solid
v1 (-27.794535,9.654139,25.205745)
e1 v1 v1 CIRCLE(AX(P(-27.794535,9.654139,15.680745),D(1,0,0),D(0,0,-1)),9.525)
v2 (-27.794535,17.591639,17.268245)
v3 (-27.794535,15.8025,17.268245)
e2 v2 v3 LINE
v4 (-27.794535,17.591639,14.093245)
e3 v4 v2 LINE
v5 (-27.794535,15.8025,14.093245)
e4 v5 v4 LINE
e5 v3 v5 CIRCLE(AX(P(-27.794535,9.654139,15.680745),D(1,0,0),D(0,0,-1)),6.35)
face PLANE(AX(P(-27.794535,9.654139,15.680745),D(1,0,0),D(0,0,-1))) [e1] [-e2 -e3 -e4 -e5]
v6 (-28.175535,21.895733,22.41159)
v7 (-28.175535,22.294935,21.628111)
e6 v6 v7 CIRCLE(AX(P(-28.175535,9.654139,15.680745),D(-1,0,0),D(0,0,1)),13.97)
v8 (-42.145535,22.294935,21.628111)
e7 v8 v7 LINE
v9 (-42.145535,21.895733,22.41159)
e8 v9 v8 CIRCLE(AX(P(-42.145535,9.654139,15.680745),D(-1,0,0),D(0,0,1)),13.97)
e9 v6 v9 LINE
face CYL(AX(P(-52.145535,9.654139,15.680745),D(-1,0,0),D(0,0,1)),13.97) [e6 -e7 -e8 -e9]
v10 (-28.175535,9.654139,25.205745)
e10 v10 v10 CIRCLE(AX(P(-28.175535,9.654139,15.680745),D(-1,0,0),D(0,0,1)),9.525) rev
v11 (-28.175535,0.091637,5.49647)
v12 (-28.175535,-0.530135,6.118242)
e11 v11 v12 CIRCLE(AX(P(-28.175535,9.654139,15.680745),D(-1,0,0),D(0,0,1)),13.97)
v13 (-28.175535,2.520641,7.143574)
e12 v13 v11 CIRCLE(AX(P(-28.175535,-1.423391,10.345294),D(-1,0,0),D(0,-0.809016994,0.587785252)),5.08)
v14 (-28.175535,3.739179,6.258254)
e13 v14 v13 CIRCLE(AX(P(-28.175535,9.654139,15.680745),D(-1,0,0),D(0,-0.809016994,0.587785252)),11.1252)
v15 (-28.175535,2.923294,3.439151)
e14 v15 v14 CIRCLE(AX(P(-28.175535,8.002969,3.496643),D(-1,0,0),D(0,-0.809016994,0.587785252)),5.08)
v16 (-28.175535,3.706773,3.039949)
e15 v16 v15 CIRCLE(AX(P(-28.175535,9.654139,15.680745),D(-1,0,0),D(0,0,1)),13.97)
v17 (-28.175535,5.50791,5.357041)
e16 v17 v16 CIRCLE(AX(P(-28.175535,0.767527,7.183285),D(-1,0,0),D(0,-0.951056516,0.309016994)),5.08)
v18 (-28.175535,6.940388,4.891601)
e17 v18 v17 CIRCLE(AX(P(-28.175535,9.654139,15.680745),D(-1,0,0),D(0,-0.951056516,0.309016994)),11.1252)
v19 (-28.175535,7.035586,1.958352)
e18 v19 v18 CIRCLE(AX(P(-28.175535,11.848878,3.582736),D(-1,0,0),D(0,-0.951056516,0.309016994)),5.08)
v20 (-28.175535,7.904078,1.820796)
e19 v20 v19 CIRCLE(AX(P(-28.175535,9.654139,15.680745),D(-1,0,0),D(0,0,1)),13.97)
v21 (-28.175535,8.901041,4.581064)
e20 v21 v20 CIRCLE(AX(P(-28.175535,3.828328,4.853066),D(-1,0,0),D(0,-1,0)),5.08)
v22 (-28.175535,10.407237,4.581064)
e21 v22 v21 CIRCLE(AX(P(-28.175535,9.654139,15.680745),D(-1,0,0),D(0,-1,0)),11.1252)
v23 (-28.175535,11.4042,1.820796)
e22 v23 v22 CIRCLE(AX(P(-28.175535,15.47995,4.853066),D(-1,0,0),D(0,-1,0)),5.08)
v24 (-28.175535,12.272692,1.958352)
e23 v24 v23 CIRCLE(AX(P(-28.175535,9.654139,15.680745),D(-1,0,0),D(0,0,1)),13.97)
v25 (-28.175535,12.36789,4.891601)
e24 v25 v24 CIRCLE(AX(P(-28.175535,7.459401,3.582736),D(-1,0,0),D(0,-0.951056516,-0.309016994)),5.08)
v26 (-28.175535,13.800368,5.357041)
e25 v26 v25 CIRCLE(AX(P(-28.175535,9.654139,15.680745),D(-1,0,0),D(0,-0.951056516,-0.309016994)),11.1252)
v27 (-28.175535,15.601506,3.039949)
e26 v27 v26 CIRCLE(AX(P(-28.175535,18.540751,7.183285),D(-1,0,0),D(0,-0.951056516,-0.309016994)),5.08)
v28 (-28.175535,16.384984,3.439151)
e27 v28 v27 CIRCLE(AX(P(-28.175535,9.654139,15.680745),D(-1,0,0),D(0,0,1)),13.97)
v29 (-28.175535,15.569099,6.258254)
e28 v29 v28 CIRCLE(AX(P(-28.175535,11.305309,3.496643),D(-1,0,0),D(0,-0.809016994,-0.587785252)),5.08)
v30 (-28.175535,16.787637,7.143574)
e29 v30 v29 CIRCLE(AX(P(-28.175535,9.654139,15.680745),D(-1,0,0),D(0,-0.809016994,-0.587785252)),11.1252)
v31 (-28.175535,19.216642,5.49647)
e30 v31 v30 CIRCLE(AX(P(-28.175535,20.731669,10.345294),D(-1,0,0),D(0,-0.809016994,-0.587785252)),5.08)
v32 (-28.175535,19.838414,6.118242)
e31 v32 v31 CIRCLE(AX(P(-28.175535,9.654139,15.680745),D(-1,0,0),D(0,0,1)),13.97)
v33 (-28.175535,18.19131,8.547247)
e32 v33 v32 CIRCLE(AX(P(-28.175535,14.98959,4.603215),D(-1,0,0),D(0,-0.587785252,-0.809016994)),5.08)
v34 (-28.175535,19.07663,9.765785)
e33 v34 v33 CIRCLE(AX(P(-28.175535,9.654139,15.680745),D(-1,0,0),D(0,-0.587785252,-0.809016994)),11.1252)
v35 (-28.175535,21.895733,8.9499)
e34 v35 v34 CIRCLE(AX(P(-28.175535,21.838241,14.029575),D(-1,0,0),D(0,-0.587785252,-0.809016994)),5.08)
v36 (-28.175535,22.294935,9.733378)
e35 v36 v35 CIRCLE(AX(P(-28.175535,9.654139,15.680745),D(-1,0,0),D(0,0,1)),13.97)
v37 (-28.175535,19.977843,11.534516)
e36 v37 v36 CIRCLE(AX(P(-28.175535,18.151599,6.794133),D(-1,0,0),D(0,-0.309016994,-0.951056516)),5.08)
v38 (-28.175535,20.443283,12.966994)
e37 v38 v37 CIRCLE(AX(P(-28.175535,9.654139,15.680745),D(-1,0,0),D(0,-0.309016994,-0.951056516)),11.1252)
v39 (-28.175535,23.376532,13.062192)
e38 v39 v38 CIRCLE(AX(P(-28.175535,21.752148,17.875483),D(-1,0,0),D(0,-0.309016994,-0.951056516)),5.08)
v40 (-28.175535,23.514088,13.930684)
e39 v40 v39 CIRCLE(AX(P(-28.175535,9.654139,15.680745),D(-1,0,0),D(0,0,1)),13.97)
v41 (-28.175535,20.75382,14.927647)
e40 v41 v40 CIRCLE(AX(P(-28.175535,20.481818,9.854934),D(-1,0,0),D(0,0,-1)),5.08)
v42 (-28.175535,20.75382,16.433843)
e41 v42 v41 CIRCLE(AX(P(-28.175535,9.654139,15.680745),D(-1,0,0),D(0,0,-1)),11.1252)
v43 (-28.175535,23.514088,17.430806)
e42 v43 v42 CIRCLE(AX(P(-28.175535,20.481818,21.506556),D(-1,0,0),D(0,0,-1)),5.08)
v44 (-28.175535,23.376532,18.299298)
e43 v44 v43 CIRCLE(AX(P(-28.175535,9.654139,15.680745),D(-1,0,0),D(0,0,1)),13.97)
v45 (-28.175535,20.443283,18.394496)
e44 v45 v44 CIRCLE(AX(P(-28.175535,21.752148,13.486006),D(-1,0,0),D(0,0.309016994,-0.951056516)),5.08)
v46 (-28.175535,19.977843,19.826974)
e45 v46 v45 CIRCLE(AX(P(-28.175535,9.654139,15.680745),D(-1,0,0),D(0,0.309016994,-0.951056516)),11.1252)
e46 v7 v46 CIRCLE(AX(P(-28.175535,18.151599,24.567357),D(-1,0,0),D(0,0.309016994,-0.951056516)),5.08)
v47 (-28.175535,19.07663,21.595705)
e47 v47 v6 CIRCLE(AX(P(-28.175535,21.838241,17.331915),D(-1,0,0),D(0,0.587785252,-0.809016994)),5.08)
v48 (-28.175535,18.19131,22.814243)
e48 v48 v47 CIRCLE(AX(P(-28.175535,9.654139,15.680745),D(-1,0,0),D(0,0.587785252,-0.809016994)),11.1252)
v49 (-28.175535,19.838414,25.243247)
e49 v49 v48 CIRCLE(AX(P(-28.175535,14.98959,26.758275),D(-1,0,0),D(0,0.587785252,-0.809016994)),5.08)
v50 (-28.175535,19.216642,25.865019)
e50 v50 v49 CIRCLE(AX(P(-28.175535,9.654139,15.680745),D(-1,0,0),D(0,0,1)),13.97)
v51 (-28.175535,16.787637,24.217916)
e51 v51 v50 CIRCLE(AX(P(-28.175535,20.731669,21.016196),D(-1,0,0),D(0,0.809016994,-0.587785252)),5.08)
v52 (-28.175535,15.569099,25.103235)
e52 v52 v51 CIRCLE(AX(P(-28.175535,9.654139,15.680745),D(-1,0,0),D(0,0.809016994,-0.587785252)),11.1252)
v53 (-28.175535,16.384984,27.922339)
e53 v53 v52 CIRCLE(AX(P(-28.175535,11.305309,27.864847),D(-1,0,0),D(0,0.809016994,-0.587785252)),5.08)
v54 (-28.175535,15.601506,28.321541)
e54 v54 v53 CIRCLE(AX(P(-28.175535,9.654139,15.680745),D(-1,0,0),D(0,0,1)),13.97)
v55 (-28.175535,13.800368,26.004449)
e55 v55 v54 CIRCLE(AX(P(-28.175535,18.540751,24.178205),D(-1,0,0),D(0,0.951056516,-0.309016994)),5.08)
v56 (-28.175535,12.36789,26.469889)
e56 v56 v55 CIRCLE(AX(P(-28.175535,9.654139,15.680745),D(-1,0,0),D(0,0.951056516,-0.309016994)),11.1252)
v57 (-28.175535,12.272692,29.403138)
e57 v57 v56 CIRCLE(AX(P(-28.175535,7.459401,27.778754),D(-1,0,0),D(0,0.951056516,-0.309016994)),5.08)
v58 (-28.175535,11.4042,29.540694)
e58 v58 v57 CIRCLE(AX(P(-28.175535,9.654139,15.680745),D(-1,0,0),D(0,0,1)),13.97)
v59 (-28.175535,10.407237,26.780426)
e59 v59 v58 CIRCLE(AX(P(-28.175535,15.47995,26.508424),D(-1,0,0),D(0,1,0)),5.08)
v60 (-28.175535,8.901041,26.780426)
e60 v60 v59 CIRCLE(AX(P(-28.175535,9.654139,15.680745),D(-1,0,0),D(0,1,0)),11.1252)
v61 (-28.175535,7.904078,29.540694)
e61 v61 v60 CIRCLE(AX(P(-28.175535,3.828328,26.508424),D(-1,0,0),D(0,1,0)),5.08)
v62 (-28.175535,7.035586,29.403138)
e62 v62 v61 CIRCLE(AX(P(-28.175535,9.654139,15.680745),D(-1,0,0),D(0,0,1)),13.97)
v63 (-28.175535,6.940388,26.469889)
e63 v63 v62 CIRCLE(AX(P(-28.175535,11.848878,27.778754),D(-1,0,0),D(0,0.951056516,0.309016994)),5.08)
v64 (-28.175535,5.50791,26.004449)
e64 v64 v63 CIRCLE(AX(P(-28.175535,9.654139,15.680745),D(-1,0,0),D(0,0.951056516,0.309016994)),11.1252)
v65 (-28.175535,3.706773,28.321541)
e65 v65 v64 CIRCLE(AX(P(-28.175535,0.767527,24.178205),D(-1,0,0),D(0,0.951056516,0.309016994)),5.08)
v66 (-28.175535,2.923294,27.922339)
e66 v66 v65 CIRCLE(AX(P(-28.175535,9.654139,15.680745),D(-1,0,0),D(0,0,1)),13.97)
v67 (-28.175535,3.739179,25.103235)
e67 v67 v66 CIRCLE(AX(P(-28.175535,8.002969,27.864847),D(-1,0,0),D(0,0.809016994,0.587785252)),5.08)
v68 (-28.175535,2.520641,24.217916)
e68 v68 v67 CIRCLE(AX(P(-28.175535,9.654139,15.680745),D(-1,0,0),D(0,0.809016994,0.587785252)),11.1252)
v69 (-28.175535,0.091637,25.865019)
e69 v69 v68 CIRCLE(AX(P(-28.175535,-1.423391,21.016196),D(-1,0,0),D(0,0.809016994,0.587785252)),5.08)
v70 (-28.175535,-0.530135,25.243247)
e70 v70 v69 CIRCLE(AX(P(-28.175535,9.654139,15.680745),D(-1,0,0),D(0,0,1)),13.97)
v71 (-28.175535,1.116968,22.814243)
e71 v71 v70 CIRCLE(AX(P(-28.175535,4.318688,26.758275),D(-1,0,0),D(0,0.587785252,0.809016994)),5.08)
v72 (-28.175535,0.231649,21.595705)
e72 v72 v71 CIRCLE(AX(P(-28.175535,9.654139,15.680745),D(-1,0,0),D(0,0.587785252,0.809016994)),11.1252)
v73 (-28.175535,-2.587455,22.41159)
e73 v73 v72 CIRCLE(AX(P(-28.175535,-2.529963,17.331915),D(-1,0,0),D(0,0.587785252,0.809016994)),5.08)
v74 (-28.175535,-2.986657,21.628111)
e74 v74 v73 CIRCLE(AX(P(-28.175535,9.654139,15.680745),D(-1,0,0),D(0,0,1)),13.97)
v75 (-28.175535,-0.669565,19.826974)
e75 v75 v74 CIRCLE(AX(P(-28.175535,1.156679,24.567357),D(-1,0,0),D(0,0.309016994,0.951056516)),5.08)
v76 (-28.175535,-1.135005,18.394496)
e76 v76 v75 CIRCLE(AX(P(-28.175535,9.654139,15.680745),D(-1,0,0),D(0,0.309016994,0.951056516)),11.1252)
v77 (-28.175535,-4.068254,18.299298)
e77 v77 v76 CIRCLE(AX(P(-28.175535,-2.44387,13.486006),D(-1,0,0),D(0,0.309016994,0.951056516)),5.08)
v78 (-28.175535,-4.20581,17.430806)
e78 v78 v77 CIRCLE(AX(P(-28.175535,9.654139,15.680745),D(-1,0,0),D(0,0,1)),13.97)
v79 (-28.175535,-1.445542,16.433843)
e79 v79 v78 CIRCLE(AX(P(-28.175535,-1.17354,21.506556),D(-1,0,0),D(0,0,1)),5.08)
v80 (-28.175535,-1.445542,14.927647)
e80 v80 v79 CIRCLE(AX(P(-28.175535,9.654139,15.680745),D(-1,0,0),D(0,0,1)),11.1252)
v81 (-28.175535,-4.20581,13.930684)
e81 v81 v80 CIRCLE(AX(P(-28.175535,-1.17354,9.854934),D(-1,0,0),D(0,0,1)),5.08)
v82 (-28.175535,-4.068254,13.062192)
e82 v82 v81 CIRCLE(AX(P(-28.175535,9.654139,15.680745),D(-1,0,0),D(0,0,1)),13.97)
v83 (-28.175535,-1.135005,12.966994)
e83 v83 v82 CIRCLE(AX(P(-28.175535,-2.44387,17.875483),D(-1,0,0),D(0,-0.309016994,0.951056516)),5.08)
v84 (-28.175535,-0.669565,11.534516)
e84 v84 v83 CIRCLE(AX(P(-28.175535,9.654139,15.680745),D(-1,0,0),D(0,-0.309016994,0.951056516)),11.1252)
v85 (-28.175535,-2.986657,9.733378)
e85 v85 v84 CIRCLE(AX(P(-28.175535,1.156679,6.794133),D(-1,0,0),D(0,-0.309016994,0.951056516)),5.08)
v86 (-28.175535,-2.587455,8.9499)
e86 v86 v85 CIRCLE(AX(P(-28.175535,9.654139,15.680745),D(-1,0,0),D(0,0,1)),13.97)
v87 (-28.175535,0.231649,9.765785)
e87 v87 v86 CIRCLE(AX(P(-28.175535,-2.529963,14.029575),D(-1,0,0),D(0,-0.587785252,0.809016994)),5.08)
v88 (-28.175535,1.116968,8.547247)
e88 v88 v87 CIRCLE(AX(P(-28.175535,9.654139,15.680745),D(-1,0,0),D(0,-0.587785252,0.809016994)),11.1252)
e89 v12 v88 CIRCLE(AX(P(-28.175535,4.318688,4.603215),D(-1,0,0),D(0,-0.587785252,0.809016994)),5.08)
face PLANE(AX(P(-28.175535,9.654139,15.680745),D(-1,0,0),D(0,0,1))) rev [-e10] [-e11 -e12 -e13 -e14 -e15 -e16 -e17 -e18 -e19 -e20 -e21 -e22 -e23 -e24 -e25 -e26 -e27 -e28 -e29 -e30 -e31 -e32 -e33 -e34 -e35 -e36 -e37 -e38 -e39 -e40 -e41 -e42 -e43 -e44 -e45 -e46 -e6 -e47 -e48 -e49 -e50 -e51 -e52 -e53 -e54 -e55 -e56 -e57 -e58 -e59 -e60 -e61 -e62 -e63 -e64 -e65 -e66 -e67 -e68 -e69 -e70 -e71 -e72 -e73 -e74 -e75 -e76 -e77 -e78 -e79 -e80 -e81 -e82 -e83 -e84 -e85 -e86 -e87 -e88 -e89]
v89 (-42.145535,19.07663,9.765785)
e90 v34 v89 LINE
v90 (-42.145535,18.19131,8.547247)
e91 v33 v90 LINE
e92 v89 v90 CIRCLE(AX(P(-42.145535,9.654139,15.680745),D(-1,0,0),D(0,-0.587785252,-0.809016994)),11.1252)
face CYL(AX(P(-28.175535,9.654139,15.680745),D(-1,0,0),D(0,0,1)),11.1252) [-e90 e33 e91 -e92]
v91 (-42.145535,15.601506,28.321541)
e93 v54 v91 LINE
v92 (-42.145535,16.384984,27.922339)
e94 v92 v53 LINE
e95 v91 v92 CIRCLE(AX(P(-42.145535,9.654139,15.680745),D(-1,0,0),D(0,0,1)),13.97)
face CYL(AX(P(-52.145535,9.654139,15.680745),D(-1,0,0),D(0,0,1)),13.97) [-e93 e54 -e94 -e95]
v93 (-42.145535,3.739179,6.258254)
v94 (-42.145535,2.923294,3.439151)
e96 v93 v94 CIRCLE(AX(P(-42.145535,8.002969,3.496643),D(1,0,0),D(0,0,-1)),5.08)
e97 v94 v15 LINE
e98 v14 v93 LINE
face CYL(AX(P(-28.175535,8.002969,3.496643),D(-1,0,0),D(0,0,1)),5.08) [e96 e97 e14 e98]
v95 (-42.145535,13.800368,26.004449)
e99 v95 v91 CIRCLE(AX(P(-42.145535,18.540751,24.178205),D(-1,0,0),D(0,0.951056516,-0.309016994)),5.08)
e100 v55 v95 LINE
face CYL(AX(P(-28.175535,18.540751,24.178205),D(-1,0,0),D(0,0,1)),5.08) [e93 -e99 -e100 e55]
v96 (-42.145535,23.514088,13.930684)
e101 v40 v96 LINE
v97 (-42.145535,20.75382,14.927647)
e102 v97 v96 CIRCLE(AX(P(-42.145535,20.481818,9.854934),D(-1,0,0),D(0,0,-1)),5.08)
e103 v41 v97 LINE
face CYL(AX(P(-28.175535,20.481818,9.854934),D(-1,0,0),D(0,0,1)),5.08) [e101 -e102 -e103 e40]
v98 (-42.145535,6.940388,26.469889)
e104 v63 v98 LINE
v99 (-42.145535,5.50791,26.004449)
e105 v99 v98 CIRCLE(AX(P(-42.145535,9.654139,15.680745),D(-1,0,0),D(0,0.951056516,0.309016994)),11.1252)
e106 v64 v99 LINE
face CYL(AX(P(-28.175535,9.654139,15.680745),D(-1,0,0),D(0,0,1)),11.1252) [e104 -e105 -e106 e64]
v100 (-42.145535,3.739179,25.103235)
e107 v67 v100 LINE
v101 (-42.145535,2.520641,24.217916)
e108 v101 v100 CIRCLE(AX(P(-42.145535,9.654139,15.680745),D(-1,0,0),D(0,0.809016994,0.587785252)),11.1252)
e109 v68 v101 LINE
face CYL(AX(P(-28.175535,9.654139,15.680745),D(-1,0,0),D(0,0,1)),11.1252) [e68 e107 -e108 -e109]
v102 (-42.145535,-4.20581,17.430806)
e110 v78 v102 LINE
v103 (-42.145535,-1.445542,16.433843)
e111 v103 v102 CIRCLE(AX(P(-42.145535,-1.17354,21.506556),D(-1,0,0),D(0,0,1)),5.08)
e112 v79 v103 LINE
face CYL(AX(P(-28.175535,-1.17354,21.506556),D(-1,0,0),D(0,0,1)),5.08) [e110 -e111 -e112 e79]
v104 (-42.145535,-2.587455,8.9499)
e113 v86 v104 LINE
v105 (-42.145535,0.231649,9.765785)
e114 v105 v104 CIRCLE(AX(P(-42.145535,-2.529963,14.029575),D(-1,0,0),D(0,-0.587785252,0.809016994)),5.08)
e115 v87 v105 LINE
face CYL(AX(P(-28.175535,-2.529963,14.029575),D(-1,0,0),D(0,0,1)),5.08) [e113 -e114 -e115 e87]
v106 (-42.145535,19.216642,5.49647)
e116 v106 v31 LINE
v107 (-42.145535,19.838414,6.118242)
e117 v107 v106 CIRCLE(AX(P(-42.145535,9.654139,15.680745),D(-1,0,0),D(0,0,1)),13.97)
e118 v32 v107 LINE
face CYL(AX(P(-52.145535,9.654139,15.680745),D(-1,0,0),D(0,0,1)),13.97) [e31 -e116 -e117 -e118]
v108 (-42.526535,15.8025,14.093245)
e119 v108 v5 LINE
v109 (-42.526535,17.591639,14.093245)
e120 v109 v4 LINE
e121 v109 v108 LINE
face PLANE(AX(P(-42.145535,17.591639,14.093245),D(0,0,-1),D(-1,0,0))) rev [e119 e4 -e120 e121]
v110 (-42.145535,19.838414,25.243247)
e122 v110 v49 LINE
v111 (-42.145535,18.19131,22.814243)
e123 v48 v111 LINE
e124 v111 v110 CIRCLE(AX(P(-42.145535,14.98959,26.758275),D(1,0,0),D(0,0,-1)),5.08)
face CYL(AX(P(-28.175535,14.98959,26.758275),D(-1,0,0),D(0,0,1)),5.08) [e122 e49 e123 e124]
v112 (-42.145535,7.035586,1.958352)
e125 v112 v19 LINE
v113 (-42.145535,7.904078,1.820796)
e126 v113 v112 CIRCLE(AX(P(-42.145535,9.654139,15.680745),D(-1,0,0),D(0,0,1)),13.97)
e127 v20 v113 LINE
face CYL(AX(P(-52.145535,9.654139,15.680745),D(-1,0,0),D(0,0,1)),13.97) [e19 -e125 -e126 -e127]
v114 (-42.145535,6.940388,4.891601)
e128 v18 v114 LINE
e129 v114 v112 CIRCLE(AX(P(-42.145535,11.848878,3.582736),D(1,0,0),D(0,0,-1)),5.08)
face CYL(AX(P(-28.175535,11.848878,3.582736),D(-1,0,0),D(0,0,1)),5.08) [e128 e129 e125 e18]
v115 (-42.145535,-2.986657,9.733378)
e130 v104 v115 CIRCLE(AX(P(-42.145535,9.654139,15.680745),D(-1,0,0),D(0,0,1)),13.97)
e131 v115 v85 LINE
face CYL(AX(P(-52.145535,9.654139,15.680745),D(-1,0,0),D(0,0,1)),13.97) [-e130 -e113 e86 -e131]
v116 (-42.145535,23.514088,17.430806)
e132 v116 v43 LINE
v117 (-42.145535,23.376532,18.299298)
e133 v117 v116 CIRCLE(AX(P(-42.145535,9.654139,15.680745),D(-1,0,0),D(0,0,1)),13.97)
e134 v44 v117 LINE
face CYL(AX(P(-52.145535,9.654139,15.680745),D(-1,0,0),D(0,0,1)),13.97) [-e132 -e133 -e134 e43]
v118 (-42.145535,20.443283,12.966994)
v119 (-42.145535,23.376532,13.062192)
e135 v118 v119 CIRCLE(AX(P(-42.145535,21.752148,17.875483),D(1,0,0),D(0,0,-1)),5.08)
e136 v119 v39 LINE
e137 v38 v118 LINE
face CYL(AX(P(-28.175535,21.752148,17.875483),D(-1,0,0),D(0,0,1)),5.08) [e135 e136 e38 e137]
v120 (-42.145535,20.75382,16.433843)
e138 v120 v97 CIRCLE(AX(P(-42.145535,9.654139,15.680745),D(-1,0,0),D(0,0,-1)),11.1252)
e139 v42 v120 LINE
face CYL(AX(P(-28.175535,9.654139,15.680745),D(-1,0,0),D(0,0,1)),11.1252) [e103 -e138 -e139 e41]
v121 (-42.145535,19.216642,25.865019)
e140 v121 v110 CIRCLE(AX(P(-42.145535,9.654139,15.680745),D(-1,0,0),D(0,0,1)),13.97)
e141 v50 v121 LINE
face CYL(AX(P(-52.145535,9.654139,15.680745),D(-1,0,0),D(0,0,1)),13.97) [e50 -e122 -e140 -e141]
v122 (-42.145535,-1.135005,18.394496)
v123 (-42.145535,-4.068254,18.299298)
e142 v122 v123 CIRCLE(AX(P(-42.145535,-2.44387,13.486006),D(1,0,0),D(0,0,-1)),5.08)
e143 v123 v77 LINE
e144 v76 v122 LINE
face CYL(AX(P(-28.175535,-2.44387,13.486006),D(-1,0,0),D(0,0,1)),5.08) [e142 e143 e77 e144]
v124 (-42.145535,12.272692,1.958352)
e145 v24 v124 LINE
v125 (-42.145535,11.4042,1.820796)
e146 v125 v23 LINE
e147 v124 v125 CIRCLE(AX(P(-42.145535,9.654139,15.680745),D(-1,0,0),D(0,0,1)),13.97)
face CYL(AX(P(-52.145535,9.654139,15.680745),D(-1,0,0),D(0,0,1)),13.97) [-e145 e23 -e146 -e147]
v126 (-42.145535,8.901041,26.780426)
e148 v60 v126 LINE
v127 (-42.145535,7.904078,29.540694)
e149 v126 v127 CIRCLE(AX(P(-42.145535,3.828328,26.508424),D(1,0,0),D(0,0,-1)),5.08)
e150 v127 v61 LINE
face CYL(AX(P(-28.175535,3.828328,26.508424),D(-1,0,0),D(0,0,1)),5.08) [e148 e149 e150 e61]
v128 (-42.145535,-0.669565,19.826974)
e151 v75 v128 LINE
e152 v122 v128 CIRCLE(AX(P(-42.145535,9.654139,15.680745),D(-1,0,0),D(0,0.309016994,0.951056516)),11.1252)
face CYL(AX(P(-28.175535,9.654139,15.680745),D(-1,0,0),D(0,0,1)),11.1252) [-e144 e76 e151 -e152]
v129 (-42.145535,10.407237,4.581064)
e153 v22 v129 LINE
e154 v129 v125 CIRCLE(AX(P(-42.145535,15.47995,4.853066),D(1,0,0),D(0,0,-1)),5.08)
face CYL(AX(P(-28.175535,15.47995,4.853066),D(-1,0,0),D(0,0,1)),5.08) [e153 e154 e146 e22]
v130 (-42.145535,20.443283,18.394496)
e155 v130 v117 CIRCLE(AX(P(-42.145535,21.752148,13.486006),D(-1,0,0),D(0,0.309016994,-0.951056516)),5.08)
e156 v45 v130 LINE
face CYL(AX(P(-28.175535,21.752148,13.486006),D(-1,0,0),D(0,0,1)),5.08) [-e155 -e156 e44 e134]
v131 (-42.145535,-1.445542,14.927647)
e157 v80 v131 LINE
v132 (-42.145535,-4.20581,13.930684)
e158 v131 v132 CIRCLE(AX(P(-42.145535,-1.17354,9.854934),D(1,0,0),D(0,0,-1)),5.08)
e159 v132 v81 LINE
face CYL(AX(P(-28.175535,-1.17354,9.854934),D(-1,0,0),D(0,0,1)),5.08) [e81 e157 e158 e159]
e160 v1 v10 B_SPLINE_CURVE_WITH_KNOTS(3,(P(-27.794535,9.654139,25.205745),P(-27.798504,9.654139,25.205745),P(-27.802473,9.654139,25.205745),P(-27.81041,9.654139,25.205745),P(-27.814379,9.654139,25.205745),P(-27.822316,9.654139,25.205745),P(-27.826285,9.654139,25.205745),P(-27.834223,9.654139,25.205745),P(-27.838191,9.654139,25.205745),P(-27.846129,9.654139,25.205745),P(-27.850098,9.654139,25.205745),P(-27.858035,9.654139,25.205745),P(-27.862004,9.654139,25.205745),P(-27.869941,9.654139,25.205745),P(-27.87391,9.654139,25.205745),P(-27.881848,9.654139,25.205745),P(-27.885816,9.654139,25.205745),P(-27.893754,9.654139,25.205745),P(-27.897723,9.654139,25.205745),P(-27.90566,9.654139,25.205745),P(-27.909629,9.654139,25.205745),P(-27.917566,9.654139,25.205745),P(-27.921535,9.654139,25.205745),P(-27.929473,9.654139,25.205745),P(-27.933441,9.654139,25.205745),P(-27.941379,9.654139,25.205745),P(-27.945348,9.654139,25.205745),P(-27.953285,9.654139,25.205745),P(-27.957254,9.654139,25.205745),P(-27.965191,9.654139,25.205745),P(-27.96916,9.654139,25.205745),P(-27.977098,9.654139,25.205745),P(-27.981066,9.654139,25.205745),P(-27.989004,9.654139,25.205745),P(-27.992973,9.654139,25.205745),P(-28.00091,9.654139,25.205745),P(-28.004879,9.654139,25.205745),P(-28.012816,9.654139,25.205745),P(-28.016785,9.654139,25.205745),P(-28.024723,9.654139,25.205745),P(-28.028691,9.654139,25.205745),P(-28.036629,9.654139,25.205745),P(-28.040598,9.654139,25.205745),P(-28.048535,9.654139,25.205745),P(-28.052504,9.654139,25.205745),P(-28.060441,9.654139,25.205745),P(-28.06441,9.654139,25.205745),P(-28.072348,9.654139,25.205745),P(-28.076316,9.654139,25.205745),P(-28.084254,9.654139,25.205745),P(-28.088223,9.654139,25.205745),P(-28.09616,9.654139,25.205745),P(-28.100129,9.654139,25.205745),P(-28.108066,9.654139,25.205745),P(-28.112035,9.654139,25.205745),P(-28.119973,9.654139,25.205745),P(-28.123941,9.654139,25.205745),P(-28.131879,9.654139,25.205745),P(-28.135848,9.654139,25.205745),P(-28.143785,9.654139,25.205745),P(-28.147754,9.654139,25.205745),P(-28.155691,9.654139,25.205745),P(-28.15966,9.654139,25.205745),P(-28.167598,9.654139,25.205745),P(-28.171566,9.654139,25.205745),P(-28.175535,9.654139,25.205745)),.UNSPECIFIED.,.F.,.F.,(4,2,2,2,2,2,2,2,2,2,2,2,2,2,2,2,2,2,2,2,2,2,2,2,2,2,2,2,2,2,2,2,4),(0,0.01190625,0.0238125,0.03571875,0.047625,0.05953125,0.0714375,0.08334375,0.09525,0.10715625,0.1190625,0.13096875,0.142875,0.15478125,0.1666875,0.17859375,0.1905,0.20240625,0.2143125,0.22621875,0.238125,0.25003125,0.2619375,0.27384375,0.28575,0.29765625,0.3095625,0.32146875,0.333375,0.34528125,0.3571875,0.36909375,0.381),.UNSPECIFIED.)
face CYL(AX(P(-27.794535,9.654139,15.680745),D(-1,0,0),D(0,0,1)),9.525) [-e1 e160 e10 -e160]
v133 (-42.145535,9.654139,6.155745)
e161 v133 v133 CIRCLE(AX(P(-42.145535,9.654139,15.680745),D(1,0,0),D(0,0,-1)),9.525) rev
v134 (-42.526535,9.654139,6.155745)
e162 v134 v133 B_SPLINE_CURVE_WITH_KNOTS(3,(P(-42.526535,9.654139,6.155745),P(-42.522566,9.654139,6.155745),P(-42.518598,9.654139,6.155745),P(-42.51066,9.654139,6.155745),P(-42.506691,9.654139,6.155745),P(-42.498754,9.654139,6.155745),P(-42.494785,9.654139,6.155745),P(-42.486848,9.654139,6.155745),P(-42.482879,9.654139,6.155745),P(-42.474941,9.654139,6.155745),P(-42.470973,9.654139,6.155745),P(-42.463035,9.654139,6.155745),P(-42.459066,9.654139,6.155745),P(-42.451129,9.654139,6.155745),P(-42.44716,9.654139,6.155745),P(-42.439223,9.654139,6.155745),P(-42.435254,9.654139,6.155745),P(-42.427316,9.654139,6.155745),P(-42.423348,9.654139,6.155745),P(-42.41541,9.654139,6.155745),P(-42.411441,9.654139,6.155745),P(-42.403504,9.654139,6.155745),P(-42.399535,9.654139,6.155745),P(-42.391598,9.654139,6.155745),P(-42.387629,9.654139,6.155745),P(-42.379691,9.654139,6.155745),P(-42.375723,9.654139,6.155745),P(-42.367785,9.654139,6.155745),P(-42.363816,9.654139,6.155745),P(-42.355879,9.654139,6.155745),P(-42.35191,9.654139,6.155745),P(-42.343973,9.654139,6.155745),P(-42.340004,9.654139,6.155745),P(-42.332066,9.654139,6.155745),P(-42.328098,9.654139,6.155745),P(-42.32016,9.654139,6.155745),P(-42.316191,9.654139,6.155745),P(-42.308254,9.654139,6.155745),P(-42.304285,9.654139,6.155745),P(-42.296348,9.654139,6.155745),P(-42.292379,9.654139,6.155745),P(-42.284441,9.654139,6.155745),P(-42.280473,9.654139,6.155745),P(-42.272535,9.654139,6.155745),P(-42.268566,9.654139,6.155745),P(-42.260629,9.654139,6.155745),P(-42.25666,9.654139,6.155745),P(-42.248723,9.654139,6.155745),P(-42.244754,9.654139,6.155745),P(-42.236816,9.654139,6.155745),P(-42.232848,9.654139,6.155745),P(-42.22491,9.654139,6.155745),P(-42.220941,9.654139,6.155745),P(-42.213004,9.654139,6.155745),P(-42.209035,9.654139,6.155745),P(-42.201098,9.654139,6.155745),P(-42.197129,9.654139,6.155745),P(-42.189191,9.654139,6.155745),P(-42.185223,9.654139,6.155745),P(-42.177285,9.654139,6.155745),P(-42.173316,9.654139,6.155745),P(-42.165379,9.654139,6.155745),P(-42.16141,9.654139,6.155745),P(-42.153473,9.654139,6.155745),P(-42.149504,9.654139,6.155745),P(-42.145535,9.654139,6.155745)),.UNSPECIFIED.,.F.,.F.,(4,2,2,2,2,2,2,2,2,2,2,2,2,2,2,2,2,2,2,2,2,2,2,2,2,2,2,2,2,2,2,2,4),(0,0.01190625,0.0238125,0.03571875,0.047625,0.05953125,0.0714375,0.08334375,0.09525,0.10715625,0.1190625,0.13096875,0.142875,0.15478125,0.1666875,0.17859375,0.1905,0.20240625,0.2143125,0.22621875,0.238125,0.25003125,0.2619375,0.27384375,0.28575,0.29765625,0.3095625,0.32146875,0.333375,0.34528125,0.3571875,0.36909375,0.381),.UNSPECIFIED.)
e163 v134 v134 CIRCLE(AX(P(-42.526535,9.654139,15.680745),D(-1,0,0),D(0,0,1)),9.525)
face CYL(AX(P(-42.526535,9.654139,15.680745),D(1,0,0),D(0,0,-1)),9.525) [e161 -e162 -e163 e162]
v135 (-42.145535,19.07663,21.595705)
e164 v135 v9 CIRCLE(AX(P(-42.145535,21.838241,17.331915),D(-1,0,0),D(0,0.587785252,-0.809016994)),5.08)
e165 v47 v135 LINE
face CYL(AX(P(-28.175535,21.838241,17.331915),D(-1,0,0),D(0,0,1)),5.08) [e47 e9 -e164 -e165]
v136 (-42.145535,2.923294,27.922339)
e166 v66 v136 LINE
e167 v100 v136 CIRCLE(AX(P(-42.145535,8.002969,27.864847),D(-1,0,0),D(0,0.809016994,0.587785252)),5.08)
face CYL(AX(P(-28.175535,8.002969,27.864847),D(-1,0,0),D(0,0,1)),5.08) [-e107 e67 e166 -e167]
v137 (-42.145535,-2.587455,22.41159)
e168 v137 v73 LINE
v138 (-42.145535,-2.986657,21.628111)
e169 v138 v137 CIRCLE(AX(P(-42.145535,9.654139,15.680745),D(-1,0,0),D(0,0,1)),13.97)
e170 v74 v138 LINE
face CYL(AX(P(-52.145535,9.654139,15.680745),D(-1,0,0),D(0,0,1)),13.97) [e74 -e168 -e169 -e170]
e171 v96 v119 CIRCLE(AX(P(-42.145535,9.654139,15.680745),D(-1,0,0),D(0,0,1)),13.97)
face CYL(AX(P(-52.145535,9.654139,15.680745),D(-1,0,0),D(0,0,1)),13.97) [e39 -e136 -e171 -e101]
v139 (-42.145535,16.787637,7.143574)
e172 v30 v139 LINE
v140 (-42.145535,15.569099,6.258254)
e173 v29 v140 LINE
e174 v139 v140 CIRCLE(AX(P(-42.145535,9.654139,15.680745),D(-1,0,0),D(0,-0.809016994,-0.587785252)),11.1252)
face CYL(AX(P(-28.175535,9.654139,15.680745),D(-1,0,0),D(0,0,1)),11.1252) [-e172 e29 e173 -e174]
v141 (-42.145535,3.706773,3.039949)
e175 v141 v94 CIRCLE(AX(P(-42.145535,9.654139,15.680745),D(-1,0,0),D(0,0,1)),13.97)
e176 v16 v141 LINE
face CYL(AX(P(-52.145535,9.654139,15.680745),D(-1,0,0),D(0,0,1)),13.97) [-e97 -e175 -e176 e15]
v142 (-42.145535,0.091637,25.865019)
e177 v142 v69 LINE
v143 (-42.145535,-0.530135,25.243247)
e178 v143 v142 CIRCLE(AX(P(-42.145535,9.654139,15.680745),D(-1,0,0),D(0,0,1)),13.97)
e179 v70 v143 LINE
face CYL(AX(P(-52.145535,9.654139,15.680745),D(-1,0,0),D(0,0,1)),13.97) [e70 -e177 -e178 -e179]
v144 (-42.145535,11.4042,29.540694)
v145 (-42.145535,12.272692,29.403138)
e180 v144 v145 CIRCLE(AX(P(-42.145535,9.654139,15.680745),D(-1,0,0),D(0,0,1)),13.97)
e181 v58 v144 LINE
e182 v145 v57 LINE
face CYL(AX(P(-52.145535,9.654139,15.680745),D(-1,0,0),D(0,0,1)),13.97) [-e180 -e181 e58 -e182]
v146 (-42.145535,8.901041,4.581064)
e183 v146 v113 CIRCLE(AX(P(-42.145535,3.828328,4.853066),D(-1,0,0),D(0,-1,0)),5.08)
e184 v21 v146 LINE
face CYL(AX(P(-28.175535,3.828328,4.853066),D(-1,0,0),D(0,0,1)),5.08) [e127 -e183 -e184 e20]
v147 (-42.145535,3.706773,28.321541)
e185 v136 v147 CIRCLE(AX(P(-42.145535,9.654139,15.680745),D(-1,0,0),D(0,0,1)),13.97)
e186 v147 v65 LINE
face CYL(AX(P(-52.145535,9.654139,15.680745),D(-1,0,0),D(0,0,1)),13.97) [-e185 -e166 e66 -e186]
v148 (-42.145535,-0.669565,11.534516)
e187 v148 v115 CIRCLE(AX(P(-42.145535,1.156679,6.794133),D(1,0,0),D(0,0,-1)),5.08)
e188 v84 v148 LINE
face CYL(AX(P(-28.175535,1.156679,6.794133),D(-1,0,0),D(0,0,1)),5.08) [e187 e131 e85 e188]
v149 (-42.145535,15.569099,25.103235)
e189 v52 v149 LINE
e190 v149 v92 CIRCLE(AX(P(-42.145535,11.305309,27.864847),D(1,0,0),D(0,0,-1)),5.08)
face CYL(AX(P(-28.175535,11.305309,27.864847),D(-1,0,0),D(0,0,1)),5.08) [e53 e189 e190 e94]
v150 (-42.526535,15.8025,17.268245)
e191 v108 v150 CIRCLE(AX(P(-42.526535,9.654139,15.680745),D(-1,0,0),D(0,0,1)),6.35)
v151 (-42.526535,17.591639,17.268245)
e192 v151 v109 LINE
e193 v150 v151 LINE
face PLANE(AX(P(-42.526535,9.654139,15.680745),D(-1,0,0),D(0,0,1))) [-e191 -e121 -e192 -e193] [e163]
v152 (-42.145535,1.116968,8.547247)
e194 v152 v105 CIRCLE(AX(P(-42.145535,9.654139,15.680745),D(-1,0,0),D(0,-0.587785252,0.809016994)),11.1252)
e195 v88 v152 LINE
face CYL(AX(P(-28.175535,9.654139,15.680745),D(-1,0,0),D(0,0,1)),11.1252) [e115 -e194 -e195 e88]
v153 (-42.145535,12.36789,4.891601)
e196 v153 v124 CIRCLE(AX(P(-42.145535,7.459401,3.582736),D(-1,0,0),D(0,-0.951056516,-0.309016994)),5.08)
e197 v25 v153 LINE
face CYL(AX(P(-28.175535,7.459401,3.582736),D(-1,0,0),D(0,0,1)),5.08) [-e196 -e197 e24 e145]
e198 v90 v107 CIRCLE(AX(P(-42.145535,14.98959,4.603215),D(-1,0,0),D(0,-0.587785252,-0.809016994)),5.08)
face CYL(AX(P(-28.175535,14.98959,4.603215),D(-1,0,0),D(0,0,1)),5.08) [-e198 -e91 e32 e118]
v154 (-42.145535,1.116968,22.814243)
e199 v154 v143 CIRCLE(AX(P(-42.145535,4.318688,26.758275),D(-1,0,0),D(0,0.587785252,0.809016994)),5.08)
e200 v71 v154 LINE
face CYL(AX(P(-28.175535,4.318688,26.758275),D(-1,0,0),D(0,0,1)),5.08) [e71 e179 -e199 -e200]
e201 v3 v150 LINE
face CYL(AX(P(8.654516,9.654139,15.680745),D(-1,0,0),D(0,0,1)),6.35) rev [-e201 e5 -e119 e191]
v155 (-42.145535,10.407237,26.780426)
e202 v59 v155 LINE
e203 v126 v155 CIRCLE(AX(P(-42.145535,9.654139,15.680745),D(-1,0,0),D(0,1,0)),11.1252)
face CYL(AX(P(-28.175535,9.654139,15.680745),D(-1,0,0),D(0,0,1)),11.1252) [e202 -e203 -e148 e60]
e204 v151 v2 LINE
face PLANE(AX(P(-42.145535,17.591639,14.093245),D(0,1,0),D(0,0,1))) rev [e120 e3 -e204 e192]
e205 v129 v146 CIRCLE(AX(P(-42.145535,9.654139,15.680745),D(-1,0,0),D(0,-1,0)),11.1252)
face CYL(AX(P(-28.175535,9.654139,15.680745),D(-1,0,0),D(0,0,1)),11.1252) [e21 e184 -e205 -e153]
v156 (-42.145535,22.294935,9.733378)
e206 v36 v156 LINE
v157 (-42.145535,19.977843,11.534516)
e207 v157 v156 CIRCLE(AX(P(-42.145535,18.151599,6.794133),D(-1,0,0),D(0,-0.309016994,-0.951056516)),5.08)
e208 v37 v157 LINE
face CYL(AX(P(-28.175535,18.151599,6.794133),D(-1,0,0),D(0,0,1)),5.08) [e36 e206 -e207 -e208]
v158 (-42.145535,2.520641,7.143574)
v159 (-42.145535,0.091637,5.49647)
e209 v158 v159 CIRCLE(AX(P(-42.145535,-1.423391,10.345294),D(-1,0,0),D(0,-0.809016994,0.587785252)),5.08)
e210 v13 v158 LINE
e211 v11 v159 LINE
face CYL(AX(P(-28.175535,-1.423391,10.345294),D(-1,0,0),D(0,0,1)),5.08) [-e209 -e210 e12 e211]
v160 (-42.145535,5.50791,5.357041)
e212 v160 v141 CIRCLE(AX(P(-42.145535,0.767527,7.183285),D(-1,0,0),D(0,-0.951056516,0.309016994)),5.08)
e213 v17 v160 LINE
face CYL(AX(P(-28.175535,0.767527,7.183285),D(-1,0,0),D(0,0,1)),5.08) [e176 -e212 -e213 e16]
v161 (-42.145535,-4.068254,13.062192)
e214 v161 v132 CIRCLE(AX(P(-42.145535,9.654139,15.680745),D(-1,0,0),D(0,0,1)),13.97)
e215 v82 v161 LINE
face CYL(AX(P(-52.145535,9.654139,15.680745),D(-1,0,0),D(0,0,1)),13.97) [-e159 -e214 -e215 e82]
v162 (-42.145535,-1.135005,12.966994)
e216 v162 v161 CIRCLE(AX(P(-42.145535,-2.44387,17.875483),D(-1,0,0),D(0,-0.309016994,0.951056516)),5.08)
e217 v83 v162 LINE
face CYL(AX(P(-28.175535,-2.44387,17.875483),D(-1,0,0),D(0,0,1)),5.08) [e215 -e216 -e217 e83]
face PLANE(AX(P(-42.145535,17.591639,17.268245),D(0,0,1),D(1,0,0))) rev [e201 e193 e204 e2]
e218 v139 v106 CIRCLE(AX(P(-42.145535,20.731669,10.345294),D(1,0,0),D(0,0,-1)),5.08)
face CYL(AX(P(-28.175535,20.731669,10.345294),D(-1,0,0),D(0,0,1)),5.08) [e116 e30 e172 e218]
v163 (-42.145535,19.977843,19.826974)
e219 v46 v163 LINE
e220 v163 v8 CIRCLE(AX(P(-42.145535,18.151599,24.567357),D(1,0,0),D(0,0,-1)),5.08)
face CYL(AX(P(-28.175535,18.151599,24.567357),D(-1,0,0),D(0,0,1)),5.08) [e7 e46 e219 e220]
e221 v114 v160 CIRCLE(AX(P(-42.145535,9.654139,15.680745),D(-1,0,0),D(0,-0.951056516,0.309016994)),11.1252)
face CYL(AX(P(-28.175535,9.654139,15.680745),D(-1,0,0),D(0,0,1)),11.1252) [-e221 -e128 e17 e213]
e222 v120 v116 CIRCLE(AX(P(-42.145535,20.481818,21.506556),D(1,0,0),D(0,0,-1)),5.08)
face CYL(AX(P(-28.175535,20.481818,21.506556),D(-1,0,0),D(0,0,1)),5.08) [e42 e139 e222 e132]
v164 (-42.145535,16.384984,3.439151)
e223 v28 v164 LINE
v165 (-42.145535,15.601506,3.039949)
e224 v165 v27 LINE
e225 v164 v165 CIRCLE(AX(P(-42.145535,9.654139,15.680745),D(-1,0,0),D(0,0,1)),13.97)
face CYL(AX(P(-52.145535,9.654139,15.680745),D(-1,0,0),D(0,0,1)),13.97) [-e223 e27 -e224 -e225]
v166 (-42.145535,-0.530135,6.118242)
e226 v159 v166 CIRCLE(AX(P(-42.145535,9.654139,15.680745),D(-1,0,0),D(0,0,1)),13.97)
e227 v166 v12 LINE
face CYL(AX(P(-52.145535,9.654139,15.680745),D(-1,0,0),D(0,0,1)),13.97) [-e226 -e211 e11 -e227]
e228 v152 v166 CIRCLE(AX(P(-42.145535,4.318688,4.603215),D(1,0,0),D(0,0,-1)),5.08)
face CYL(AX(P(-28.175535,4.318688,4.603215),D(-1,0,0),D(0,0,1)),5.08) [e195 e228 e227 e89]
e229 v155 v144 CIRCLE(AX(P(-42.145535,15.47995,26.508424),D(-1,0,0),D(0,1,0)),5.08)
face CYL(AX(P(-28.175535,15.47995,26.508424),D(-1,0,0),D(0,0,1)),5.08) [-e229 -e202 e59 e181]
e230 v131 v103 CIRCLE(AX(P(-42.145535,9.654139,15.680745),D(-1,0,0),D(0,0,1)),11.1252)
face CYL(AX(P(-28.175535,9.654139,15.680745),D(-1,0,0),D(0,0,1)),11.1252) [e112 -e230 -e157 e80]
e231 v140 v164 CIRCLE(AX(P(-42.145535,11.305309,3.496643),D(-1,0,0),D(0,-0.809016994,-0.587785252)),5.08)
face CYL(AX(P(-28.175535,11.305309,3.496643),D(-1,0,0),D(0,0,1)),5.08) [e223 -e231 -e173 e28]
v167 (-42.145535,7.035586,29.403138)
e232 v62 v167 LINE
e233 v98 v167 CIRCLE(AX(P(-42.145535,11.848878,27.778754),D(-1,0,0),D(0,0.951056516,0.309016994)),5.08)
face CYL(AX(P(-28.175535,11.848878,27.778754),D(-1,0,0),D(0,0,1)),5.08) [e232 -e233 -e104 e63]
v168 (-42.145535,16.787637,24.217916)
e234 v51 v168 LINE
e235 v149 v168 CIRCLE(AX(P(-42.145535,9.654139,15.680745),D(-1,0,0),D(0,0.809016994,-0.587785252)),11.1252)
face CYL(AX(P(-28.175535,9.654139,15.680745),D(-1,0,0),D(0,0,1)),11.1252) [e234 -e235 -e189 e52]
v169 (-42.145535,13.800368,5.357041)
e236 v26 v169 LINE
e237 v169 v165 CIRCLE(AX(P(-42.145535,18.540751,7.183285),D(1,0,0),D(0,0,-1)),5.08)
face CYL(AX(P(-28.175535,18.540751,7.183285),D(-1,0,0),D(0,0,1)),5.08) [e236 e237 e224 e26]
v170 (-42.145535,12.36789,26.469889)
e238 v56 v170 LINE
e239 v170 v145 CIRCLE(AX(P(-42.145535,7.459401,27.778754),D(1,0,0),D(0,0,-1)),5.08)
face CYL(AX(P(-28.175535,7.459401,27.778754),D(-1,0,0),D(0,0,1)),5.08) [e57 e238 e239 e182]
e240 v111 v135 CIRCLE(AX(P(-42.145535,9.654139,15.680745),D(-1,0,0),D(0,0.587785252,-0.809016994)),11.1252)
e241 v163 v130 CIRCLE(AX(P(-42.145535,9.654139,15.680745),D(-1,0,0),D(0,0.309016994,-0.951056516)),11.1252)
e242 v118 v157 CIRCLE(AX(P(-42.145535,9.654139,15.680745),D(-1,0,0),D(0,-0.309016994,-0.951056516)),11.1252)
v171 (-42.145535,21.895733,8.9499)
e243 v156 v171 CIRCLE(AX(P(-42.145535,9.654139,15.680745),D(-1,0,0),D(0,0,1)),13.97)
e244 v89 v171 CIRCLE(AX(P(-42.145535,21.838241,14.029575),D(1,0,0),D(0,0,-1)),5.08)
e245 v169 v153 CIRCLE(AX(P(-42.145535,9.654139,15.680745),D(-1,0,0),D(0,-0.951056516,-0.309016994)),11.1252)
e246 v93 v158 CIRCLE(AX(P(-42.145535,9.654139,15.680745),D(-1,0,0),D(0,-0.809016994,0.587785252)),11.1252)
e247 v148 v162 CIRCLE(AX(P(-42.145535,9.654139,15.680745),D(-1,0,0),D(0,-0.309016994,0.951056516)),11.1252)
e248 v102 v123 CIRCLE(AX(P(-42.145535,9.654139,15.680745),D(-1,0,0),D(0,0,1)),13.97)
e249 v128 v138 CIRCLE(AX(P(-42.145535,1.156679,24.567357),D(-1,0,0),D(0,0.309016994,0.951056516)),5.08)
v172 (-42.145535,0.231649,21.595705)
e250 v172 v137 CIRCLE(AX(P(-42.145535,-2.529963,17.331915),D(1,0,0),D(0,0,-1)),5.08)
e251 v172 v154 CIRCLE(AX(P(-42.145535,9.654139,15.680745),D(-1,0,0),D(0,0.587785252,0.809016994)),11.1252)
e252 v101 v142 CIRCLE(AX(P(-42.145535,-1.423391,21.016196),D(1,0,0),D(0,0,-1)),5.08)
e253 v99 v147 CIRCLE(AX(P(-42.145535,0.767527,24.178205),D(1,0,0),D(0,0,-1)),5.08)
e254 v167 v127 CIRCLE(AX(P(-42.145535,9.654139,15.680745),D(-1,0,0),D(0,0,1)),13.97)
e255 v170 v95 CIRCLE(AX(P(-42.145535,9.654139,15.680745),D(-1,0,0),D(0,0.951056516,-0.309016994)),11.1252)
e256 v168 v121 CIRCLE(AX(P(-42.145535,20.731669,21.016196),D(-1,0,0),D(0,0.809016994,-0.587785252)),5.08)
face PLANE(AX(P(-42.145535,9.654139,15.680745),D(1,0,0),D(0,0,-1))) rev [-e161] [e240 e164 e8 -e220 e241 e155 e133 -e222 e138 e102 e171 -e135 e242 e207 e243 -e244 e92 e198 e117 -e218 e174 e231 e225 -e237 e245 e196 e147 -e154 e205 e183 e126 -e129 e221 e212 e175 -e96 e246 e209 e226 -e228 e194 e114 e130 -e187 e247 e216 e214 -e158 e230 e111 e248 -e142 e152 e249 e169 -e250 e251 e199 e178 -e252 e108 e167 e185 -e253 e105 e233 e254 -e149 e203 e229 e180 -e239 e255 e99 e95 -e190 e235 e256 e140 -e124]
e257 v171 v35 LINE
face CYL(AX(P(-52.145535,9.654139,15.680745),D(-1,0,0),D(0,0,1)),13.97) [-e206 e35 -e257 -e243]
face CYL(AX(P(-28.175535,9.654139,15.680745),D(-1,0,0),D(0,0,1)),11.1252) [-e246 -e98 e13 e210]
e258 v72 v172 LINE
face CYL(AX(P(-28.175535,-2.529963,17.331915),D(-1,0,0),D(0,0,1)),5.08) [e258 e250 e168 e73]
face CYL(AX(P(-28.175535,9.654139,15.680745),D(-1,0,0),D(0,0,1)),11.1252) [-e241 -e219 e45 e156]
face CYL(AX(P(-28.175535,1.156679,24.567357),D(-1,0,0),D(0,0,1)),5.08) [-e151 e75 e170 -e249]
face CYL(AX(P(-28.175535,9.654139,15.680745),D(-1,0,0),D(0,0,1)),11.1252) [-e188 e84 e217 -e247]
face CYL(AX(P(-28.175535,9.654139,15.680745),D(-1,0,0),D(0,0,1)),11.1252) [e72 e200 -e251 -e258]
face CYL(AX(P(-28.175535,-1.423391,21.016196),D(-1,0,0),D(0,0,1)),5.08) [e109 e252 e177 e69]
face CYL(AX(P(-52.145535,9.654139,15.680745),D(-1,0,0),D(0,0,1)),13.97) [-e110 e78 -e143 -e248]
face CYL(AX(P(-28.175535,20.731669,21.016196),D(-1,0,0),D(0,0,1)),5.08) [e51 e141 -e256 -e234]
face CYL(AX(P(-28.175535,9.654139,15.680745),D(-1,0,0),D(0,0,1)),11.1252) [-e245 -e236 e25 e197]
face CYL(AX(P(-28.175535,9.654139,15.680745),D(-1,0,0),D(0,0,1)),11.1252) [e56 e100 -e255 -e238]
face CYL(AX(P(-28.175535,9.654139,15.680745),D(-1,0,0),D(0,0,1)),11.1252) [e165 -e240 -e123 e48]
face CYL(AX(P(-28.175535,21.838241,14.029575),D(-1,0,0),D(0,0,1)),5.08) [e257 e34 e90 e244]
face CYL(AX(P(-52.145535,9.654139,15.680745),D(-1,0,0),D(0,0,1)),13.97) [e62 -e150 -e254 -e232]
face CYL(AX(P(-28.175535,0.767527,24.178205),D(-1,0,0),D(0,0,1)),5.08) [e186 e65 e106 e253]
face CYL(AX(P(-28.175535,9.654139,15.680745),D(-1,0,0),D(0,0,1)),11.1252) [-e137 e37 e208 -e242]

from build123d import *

# Parameters (mm, degrees)
SPUR_START             = -42.145535126
SPUR_GEAR_AI_OUTLINE_R = 6.35
SPUR_GEAR_AI_DEPTH     = 13.97
SKETCH1_W              = 3.175
SKETCH1_H              = 3.175
CUT_EXTRUDE1_DEPTH     = 41.258239372
SKETCH2_R              = 9.525
BOSS_EXTRUDE1_DEPTH    = 0.381
BOSS_EXTRUDE2_START    = 0.381
SKETCH3_R              = 9.525
BOSS_EXTRUDE2_DEPTH    = 0.381


# Read off the part's stored shape, not the designer's step: spur gear_ai
with BuildPart() as part:
    # spur gear_ai outline → spur gear_ai (new body)
    with BuildSketch(Plane.YZ.offset(SPUR_START)):
        with BuildLine():
            ThreePointArc((21.89573329, 8.949900066), (22.10150024, 9.338497576), (22.294935451, 9.733378421))
            ThreePointArc((22.294935451, 9.733378421), (21.269289936, 10.804918767), (19.977842952, 11.534516))
            ThreePointArc((19.977842952, 11.534516), (20.234833052, 12.242868992), (20.443283136, 12.966993591))
            ThreePointArc((20.443283136, 12.966993591), (21.916932187, 12.79815666), (23.376532451, 13.062191702))
            ThreePointArc((23.376532451, 13.062191702), (23.452145215, 13.495355381), (23.514088141, 13.93068415))
            ThreePointArc((23.514088141, 13.93068415), (22.207517114, 14.632837684), (20.7538201, 14.927646821))
            ThreePointArc((20.7538201, 14.927646821), (20.779339097, 15.680744858), (20.7538201, 16.433842895))
            ThreePointArc((20.7538201, 16.433842895), (22.207517114, 16.728652032), (23.514088141, 17.430805566))
            ThreePointArc((23.514088141, 17.430805566), (23.452145215, 17.866134334), (23.376532451, 18.299298013))
            ThreePointArc((23.376532451, 18.299298013), (21.916932187, 18.563333056), (20.443283136, 18.394496125))
            ThreePointArc((20.443283136, 18.394496125), (20.234833052, 19.118620724), (19.977842952, 19.826973715))
            ThreePointArc((19.977842952, 19.826973715), (21.269289936, 20.556570948), (22.294935451, 21.628111294))
            ThreePointArc((22.294935451, 21.628111294), (22.10150024, 22.022992139), (21.89573329, 22.41158965))
            ThreePointArc((21.89573329, 22.41158965), (20.425979632, 22.21166061), (19.07662958, 21.595704547))
            ThreePointArc((19.07662958, 21.595704547), (18.654614962, 22.219973346), (18.191309741, 22.814242767))
            ThreePointArc((18.191309741, 22.814242767), (19.194090867, 23.907210035), (19.83841354, 25.243247358))
            ThreePointArc((19.83841354, 25.243247358), (19.53242083, 25.559026591), (19.216641597, 25.865019301))
            ThreePointArc((19.216641597, 25.865019301), (17.880604274, 25.220696628), (16.787637006, 24.217915502))
            ThreePointArc((16.787637006, 24.217915502), (16.193367585, 24.681220723), (15.569098786, 25.103235341))
            ThreePointArc((15.569098786, 25.103235341), (16.185054849, 26.452585393), (16.384983889, 27.922339051))
            ThreePointArc((16.384983889, 27.922339051), (15.996386378, 28.128106001), (15.601505533, 28.321541212))
            ThreePointArc((15.601505533, 28.321541212), (14.529965187, 27.295895697), (13.800367954, 26.004448713))
            ThreePointArc((13.800367954, 26.004448713), (13.092014963, 26.261438813), (12.367890364, 26.469888897))
            ThreePointArc((12.367890364, 26.469888897), (12.536727295, 27.943537948), (12.272692252, 29.403138212))
            ThreePointArc((12.272692252, 29.403138212), (11.839528573, 29.478750976), (11.404199805, 29.540693902))
            ThreePointArc((11.404199805, 29.540693902), (10.702046271, 28.234122875), (10.407237134, 26.780425861))
            ThreePointArc((10.407237134, 26.780425861), (9.654139097, 26.805944858), (8.90104106, 26.780425861))
            ThreePointArc((8.90104106, 26.780425861), (8.606231923, 28.234122875), (7.904078389, 29.540693902))
            ThreePointArc((7.904078389, 29.540693902), (7.46874962, 29.478750976), (7.035585941, 29.403138212))
            ThreePointArc((7.035585941, 29.403138212), (6.771550899, 27.943537948), (6.94038783, 26.469888897))
            ThreePointArc((6.94038783, 26.469888897), (6.216263231, 26.261438813), (5.507910239, 26.004448713))
            ThreePointArc((5.507910239, 26.004448713), (4.778313006, 27.295895697), (3.70677266, 28.321541212))
            ThreePointArc((3.70677266, 28.321541212), (3.311891815, 28.128106001), (2.923294305, 27.922339051))
            ThreePointArc((2.923294305, 27.922339051), (3.123223344, 26.452585393), (3.739179408, 25.103235341))
            ThreePointArc((3.739179408, 25.103235341), (3.114910608, 24.681220723), (2.520641187, 24.217915502))
            ThreePointArc((2.520641187, 24.217915502), (1.427673919, 25.220696628), (0.091636597, 25.865019301))
            ThreePointArc((0.091636597, 25.865019301), (-0.224142637, 25.559026591), (-0.530135347, 25.243247358))
            ThreePointArc((-0.530135347, 25.243247358), (0.114187326, 23.907210035), (1.116968452, 22.814242767))
            ThreePointArc((1.116968452, 22.814242767), (0.653663231, 22.219973346), (0.231648613, 21.595704547))
            ThreePointArc((0.231648613, 21.595704547), (-1.117701439, 22.21166061), (-2.587455096, 22.41158965))
            ThreePointArc((-2.587455096, 22.41158965), (-2.793222046, 22.022992139), (-2.986657258, 21.628111294))
            ThreePointArc((-2.986657258, 21.628111294), (-1.961011743, 20.556570948), (-0.669564759, 19.826973715))
            ThreePointArc((-0.669564759, 19.826973715), (-0.926554858, 19.118620723), (-1.135004943, 18.394496125))
            ThreePointArc((-1.135004943, 18.394496125), (-2.608653994, 18.563333056), (-4.068254258, 18.299298013))
            ThreePointArc((-4.068254258, 18.299298013), (-4.143867021, 17.866134334), (-4.205809948, 17.430805566))
            ThreePointArc((-4.205809948, 17.430805566), (-2.899238921, 16.728652032), (-1.445541907, 16.433842895))
            ThreePointArc((-1.445541907, 16.433842895), (-1.471060903, 15.680744858), (-1.445541907, 14.927646821))
            ThreePointArc((-1.445541907, 14.927646821), (-2.899238921, 14.632837684), (-4.205809948, 13.93068415))
            ThreePointArc((-4.205809948, 13.93068415), (-4.143867021, 13.495355381), (-4.068254258, 13.062191702))
            ThreePointArc((-4.068254258, 13.062191702), (-2.608653994, 12.79815666), (-1.135004943, 12.966993591))
            ThreePointArc((-1.135004943, 12.966993591), (-0.926554858, 12.242868992), (-0.669564759, 11.534516))
            ThreePointArc((-0.669564759, 11.534516), (-1.961011743, 10.804918767), (-2.986657258, 9.733378421))
            ThreePointArc((-2.986657258, 9.733378421), (-2.793222046, 9.338497576), (-2.587455096, 8.949900066))
            ThreePointArc((-2.587455096, 8.949900066), (-1.117701439, 9.149829105), (0.231648613, 9.765785169))
            ThreePointArc((0.231648613, 9.765785169), (0.653663231, 9.141516369), (1.116968452, 8.547246948))
            ThreePointArc((1.116968452, 8.547246948), (0.114187326, 7.45427968), (-0.530135347, 6.118242358))
            ThreePointArc((-0.530135347, 6.118242358), (-0.224142637, 5.802463124), (0.091636597, 5.496470414))
            ThreePointArc((0.091636597, 5.496470414), (1.427673919, 6.140793087), (2.520641187, 7.143574213))
            ThreePointArc((2.520641187, 7.143574213), (3.114910608, 6.680268992), (3.739179408, 6.258254374))
            ThreePointArc((3.739179408, 6.258254374), (3.123223344, 4.908904322), (2.923294305, 3.439150665))
            ThreePointArc((2.923294305, 3.439150665), (3.311891815, 3.233383715), (3.70677266, 3.039948503))
            ThreePointArc((3.70677266, 3.039948503), (4.778313006, 4.065594018), (5.507910239, 5.357041002))
            ThreePointArc((5.507910239, 5.357041002), (6.216263231, 5.100050903), (6.94038783, 4.891600818))
            ThreePointArc((6.94038783, 4.891600818), (6.771550899, 3.417951767), (7.035585941, 1.958351503))
            ThreePointArc((7.035585941, 1.958351503), (7.46874962, 1.882738739), (7.904078389, 1.820795813))
            ThreePointArc((7.904078389, 1.820795813), (8.606231923, 3.12736684), (8.90104106, 4.581063854))
            ThreePointArc((8.90104106, 4.581063854), (9.654139097, 4.555544858), (10.407237134, 4.581063854))
            ThreePointArc((10.407237134, 4.581063854), (10.702046271, 3.12736684), (11.404199805, 1.820795813))
            ThreePointArc((11.404199805, 1.820795813), (11.839528573, 1.882738739), (12.272692252, 1.958351503))
            ThreePointArc((12.272692252, 1.958351503), (12.536727295, 3.417951767), (12.367890364, 4.891600818))
            ThreePointArc((12.367890364, 4.891600818), (13.092014962, 5.100050903), (13.800367954, 5.357041002))
            ThreePointArc((13.800367954, 5.357041002), (14.529965187, 4.065594018), (15.601505533, 3.039948503))
            ThreePointArc((15.601505533, 3.039948503), (15.996386378, 3.233383715), (16.384983889, 3.439150665))
            ThreePointArc((16.384983889, 3.439150665), (16.185054849, 4.908904322), (15.569098786, 6.258254374))
            ThreePointArc((15.569098786, 6.258254374), (16.193367585, 6.680268992), (16.787637006, 7.143574213))
            ThreePointArc((16.787637006, 7.143574213), (17.880604274, 6.140793087), (19.216641597, 5.496470414))
            ThreePointArc((19.216641597, 5.496470414), (19.53242083, 5.802463124), (19.83841354, 6.118242358))
            ThreePointArc((19.83841354, 6.118242358), (19.194090867, 7.45427968), (18.191309741, 8.547246948))
            ThreePointArc((18.191309741, 8.547246948), (18.654614962, 9.141516369), (19.07662958, 9.765785169))
            ThreePointArc((19.07662958, 9.765785169), (20.425979632, 9.149829105), (21.89573329, 8.949900066))
        make_face()
        with Locations((9.654139097, 15.680744858)):
            Circle(SPUR_GEAR_AI_OUTLINE_R, mode=Mode.SUBTRACT)
    extrude(amount=SPUR_GEAR_AI_DEPTH)

    # Sketch1 → Cut-Extrude1 (cut, through all)
    with BuildSketch(Plane(origin=(-28.175535126, 0, 0), x_dir=(0, 0, -1), z_dir=(1, 0, 0))):
        with Locations((-15.680744858, 16.004139097)):
            Rectangle(SKETCH1_W, SKETCH1_H)
    extrude(amount=-CUT_EXTRUDE1_DEPTH, mode=Mode.SUBTRACT)

    # Sketch2 → Boss-Extrude1 (add)
    with BuildSketch(Plane(origin=(-28.175535126, 0, 0), x_dir=(0, 0, -1), z_dir=(1, 0, 0))):
        with Locations(Location((-15.680744858, 9.654139097, 0), (0, 0, 180))):
            Circle(SKETCH2_R)
        with BuildLine():
            Line((-14.093244858, 17.591639097), (-17.268244858, 17.591639097))
            Line((-17.268244858, 17.591639097), (-17.268244858, 15.802500159))
            ThreePointArc((-17.268244858, 15.802500159), (-15.680744858, 3.304139097), (-14.093244858, 15.802500159))
            Line((-14.093244858, 15.802500159), (-14.093244858, 17.591639097))
        make_face(mode=Mode.SUBTRACT)
    extrude(amount=BOSS_EXTRUDE1_DEPTH)

    # Sketch3 → Boss-Extrude2 (add)
    with BuildSketch(Plane.ZY.offset(42.145535126).offset(BOSS_EXTRUDE2_START)):
        with Locations((15.680744858, 9.654139097)):
            Circle(SKETCH3_R)
        with BuildLine():
            Line((14.093244858, 15.802500159), (14.093244858, 17.591639097))
            Line((14.093244858, 17.591639097), (17.268244858, 17.591639097))
            Line((17.268244858, 17.591639097), (17.268244858, 15.802500159))
            ThreePointArc((17.268244858, 15.802500159), (15.680744858, 3.304139097), (14.093244858, 15.802500159))
        make_face(mode=Mode.SUBTRACT)
    extrude(amount=-BOSS_EXTRUDE2_DEPTH)


solid = part.part
